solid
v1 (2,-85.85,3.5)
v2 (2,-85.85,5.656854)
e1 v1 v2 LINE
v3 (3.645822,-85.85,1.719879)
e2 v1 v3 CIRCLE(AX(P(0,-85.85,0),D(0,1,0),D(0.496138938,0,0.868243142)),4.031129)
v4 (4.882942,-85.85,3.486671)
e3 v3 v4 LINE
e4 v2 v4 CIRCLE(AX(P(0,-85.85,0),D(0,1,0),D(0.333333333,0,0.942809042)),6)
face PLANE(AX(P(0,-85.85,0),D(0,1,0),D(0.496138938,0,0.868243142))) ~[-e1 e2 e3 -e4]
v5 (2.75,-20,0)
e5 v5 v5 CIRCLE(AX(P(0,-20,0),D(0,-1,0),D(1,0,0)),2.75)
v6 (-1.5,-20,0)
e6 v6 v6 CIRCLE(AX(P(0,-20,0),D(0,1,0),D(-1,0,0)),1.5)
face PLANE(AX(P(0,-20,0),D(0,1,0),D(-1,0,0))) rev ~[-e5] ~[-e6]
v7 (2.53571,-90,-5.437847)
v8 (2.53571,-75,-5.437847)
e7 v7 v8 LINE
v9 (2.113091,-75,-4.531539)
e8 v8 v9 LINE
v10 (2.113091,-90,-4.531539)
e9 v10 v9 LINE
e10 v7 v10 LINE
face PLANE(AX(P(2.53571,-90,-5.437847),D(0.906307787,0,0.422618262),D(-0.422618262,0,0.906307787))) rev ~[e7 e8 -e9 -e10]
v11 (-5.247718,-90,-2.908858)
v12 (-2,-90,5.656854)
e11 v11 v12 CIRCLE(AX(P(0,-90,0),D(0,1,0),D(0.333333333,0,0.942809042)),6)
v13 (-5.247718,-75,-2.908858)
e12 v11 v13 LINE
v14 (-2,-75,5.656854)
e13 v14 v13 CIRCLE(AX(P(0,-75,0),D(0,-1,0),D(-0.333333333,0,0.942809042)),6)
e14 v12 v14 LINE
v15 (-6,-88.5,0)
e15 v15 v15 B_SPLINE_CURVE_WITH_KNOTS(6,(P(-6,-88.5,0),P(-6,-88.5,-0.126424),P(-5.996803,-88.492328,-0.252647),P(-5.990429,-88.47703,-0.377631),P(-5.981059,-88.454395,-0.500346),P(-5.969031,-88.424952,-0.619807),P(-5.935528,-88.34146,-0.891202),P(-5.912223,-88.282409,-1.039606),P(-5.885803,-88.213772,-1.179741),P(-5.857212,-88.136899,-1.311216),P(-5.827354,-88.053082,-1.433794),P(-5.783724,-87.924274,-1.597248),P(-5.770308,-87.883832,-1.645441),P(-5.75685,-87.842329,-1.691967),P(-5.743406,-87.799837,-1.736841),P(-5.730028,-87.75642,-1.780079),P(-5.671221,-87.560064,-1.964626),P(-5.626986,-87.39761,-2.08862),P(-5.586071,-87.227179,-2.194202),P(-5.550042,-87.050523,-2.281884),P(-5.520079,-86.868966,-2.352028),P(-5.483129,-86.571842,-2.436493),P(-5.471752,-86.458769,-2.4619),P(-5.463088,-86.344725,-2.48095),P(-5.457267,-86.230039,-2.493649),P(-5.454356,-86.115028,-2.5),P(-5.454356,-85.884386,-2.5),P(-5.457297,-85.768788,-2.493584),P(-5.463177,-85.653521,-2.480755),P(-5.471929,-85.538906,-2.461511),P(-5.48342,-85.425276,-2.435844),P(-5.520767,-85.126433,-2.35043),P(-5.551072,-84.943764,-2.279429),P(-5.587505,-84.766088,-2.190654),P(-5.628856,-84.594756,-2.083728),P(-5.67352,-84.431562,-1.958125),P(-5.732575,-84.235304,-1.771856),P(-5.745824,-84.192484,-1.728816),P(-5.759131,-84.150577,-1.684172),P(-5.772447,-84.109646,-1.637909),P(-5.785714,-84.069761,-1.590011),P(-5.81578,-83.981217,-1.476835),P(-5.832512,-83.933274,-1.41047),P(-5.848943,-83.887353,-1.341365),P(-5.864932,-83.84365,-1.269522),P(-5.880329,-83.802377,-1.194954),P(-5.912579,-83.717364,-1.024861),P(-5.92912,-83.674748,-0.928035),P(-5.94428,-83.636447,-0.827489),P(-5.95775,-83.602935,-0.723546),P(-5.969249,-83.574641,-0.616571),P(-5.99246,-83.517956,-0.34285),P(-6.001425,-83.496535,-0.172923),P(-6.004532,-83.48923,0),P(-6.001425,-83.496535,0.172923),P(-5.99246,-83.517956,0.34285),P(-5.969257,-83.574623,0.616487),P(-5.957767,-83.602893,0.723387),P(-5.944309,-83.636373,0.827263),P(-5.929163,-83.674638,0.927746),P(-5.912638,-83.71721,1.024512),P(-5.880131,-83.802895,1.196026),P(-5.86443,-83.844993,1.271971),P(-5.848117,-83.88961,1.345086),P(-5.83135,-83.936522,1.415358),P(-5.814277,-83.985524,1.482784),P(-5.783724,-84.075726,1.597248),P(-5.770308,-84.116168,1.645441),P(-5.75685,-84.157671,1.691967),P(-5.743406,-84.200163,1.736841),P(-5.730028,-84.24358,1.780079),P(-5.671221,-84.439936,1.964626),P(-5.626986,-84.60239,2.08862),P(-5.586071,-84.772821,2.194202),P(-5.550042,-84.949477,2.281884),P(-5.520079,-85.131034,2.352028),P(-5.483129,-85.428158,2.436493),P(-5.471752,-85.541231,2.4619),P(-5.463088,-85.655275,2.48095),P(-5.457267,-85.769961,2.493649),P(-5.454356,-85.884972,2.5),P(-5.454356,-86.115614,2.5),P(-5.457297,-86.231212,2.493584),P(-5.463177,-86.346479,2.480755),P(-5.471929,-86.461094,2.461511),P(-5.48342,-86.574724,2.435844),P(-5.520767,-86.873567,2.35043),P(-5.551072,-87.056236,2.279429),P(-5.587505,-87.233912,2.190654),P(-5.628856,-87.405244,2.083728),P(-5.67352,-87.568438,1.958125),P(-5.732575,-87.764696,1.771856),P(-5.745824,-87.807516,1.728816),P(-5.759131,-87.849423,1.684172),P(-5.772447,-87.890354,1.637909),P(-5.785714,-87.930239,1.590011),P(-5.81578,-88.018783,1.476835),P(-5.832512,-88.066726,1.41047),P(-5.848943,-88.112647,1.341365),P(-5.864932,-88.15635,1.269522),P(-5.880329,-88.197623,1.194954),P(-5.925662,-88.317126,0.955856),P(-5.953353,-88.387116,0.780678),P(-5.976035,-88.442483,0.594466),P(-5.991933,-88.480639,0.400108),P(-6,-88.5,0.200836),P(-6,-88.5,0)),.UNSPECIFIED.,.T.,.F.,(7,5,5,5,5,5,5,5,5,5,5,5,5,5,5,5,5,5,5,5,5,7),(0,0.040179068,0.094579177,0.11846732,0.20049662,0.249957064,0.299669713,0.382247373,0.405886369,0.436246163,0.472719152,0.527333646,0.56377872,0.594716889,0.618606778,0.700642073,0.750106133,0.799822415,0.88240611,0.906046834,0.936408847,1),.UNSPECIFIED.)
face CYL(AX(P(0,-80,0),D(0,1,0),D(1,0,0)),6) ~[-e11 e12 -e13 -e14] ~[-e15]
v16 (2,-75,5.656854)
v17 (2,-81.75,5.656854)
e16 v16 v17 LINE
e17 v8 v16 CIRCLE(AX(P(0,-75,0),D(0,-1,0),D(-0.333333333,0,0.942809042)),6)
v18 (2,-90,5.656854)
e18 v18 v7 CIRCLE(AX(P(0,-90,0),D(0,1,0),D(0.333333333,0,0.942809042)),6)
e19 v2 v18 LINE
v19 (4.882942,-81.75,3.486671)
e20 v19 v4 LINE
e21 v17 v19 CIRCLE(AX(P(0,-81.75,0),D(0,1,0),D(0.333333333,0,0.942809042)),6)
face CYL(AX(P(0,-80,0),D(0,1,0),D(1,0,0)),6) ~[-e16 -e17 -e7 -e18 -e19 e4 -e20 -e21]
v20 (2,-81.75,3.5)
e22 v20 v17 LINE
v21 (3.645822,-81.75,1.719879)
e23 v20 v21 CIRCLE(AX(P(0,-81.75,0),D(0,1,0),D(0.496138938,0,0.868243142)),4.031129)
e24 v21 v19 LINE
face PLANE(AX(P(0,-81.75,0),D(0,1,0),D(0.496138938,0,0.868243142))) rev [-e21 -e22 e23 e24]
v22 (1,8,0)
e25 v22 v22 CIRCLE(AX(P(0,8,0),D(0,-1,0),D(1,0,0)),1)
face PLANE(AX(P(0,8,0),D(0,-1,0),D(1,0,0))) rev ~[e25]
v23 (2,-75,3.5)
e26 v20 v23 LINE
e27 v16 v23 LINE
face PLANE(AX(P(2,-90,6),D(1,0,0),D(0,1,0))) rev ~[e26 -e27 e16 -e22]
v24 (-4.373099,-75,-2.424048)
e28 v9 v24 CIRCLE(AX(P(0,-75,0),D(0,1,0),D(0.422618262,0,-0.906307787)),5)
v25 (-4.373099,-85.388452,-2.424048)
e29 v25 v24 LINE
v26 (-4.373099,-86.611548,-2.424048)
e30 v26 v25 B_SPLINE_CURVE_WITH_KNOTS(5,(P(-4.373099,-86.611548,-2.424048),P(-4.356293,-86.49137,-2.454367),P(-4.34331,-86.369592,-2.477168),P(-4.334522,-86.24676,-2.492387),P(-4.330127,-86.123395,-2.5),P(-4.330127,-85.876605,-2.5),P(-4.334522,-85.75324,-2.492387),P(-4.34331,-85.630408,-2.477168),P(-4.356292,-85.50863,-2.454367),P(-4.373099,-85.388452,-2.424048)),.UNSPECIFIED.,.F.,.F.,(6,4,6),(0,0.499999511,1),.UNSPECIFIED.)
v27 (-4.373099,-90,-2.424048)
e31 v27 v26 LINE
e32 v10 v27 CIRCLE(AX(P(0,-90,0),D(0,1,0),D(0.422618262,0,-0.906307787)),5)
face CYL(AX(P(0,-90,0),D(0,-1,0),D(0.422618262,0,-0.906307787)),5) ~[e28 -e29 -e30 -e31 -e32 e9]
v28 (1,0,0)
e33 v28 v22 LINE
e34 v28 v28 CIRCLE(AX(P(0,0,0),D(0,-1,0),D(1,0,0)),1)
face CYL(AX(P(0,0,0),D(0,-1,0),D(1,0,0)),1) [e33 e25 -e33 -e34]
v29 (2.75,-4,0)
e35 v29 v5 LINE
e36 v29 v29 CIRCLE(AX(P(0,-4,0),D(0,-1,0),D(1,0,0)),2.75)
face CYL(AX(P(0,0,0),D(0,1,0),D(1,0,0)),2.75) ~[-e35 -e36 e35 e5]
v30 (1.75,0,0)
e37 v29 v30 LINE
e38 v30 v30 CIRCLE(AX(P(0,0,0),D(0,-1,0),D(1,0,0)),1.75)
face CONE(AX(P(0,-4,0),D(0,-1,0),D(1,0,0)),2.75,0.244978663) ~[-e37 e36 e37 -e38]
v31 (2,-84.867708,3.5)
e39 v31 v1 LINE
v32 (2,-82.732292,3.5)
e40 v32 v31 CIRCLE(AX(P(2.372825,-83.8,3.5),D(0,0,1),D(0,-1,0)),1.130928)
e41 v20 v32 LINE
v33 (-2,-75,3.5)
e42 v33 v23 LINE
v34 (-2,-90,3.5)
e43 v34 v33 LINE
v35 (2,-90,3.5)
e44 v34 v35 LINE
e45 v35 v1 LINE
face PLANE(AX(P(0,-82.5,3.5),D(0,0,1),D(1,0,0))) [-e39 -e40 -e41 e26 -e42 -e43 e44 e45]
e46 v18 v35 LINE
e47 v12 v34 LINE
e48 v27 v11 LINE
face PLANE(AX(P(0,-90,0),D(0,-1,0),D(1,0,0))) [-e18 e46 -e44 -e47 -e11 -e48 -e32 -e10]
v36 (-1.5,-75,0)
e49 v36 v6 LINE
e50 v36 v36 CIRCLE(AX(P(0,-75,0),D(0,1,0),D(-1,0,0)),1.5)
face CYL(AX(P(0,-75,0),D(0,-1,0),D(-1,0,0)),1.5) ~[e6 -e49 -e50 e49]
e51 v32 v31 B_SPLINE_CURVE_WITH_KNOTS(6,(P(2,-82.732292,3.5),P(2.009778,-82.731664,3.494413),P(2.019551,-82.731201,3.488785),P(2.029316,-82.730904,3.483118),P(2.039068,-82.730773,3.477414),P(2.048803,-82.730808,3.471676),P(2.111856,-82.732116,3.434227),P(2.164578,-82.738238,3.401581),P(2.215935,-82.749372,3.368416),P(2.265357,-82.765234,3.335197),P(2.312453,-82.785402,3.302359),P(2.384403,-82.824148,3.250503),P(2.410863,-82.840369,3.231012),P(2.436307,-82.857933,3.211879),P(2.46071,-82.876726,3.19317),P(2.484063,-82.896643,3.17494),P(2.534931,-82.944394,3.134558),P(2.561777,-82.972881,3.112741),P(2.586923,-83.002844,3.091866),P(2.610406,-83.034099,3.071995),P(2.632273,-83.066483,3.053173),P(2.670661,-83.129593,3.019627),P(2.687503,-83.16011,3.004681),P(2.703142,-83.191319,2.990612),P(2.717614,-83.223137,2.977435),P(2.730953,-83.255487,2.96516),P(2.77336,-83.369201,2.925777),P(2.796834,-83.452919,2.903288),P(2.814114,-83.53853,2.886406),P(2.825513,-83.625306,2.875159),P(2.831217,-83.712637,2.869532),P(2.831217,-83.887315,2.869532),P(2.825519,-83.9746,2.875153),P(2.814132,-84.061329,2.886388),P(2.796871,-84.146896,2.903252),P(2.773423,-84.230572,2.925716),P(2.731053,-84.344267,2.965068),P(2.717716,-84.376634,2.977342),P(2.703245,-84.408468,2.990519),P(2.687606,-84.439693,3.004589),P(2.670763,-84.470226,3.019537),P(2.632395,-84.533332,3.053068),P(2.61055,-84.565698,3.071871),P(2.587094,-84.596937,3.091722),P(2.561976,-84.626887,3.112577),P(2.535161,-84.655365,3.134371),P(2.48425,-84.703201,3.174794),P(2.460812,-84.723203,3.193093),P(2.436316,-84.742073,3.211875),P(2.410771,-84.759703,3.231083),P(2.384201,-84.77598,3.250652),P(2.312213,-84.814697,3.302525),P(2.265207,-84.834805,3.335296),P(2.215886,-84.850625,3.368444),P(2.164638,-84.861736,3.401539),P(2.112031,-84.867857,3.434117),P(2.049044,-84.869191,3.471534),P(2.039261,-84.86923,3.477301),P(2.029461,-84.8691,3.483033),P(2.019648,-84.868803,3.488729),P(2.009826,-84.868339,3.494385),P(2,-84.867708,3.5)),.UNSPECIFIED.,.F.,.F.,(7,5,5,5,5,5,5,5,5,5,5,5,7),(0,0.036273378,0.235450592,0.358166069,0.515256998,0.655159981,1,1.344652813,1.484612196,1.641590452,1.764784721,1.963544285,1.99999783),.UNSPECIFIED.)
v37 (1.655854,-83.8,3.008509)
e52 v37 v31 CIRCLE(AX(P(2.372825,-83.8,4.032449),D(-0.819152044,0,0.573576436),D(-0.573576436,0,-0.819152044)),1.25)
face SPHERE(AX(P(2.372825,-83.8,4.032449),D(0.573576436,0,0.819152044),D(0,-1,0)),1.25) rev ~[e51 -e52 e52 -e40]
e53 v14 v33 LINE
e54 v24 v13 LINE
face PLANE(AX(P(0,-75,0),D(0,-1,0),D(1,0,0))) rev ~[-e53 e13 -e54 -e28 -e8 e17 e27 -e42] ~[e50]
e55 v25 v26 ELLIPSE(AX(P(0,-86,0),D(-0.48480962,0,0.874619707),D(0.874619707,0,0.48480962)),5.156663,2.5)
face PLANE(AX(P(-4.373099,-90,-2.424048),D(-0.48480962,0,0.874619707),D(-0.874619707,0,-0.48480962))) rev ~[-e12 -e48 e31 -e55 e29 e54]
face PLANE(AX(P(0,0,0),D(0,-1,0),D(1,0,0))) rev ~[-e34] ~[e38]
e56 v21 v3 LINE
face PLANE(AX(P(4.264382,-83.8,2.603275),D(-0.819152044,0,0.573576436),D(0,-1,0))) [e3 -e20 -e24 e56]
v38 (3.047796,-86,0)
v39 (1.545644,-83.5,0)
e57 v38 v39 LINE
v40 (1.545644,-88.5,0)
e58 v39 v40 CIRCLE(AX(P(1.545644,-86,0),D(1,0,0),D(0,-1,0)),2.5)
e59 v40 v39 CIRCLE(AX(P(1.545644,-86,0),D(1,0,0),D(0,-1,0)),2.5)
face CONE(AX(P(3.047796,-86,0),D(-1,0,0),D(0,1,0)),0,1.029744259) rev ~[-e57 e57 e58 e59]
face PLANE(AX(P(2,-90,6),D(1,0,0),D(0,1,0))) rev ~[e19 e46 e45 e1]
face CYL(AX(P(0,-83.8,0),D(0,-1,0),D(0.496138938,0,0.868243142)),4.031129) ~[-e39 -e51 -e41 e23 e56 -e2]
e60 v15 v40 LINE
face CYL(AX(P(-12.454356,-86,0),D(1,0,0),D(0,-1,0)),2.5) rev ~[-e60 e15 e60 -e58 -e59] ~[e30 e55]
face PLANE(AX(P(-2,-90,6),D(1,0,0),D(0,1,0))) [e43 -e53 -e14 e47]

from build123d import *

# Parameters (mm, degrees)
F0_R      = 1
F1_DEPTH  = 8
F2_R      = 2.75
F3_DEPTH  = 80
F4_SIZE2  = 1
F4_SIZE   = 4
F5_R      = 6
F5_R_2    = 2.75
F6_DEPTH  = 5
F7_DEPTH  = 10
F12_R     = 2.75
F12_R_2   = 1.5
F13_DEPTH = 55
F15_D     = 5
F15_DEPTH = 7
F15_START = 0.545644
F15_TIP   = 1.5021515476
F16_W     = 4
F16_H     = 15
F17_DEPTH = 2.5
F19_W     = 4.1
F19_H     = 2.1568542495
F20_ANGLE = 35
F28_DEPTH = 15


with BuildPart() as f1:
    # F0 (on Front) → F1 (new body)
    with BuildSketch(Plane.XZ):
        Circle(F0_R)
    extrude(amount=-F1_DEPTH)

    # F2 (on face) → F3 (join)
    with BuildSketch(Plane.XZ):
        Circle(F2_R)
    extrude(amount=F3_DEPTH)

    # F4
    f4_edges = [f1.edges().sort_by_distance(p)[0] for p in [
        (-2.75, 0, 0),
    ]]
    f4_side = f1.faces().sort_by_distance((-2.75, -40, 0))[0]
    chamfer(f4_edges, length=F4_SIZE, length2=F4_SIZE2, reference=f4_side)

    # F5 (on face) → F6 (join)
    with BuildSketch(Plane.XZ.offset(80)):
        Circle(F5_R)
        Circle(F5_R_2, mode=Mode.SUBTRACT)
    extrude(amount=-F6_DEPTH)

    # F7 (add): a face of the model
    f7_faces = [f1.faces().sort_by_distance(p)[0] for p in [
        (0, -80, 0),
    ]]
    extrude(f7_faces, amount=F7_DEPTH)

    # F12 (on face) → F13 (cut)
    with BuildSketch(Plane(origin=(0, -75, 0), x_dir=(-1, 0, 0), z_dir=(0, 1, 0))):
        Circle(F12_R)
        Circle(F12_R_2, mode=Mode.SUBTRACT)
    extrude(amount=F13_DEPTH, mode=Mode.SUBTRACT)

    # F15
    # its depths count from where the whole tool has entered the part; down to there all is cleared
    with Locations(Plane(origin=(-6, 0, 0), x_dir=(0, 1, 0), z_dir=(-1, 0, 0)).offset(-F15_START)):
        with Locations((-86, 0)):
            Hole(F15_D / 2, depth=F15_DEPTH)
            with Locations((0, 0, -(F15_DEPTH + F15_TIP / 2))):  # 118° drill point
                Cone(0, F15_D / 2, F15_TIP, mode=Mode.SUBTRACT)

    # F16 (on offset) → F17 (cut)
    with BuildSketch(Plane.XY.offset(6)):
        with Locations((0, -82.5)):
            Rectangle(F16_W, F16_H)
    extrude(amount=-F17_DEPTH, mode=Mode.SUBTRACT)

    # F19 (on face) → F20 (revolve, cut)
    with BuildSketch(Plane(origin=(2, 0, 0), x_dir=(0, -1, 0), z_dir=(-1, 0, 0))):
        with Locations((83.8, 4.5784271247)):
            Rectangle(F19_W, F19_H)
    revolve(axis=Axis((0, -80, 0), (0, 1, 0)), revolution_arc=F20_ANGLE, mode=Mode.SUBTRACT)

    # F25 (on face) → F26 (revolve, cut)
    with BuildSketch(Plane(origin=(-0.302441943, 0, 0.2117721284), x_dir=(0, -1, 0), z_dir=(-0.8191520443, 0, 0.5735764364))):
        with BuildLine():
            Line((83.8, 5.9141850277), (83.8, 3.4141850277))
            ThreePointArc((83.8, 3.4141850277), (85.05, 4.6641850277), (83.8, 5.9141850277))
        make_face()
    revolve(axis=Axis((2.3728246836, -83.8, 4.0324488288), (0.5735764364, 0, 0.8191520443)), mode=Mode.SUBTRACT)

    # F27 (on face) → F28 (cut)
    with BuildSketch(Plane.XZ.offset(90)):
        with BuildLine():
            ThreePointArc((-5.2477182428, -2.9088577215), (-1.8541019662, -5.7063390978), (2.5357095704, -5.4378467222))
            Line((2.5357095704, -5.4378467222), (2.1130913087, -4.5315389352))
            ThreePointArc((2.1130913087, -4.5315389352), (-1.5450849719, -4.7552825815), (-4.3730985357, -2.4240481012))
            Line((-4.3730985357, -2.4240481012), (-5.2477182428, -2.9088577215))
        make_face()
    extrude(amount=-F28_DEPTH, mode=Mode.SUBTRACT)


solid = f1.part
